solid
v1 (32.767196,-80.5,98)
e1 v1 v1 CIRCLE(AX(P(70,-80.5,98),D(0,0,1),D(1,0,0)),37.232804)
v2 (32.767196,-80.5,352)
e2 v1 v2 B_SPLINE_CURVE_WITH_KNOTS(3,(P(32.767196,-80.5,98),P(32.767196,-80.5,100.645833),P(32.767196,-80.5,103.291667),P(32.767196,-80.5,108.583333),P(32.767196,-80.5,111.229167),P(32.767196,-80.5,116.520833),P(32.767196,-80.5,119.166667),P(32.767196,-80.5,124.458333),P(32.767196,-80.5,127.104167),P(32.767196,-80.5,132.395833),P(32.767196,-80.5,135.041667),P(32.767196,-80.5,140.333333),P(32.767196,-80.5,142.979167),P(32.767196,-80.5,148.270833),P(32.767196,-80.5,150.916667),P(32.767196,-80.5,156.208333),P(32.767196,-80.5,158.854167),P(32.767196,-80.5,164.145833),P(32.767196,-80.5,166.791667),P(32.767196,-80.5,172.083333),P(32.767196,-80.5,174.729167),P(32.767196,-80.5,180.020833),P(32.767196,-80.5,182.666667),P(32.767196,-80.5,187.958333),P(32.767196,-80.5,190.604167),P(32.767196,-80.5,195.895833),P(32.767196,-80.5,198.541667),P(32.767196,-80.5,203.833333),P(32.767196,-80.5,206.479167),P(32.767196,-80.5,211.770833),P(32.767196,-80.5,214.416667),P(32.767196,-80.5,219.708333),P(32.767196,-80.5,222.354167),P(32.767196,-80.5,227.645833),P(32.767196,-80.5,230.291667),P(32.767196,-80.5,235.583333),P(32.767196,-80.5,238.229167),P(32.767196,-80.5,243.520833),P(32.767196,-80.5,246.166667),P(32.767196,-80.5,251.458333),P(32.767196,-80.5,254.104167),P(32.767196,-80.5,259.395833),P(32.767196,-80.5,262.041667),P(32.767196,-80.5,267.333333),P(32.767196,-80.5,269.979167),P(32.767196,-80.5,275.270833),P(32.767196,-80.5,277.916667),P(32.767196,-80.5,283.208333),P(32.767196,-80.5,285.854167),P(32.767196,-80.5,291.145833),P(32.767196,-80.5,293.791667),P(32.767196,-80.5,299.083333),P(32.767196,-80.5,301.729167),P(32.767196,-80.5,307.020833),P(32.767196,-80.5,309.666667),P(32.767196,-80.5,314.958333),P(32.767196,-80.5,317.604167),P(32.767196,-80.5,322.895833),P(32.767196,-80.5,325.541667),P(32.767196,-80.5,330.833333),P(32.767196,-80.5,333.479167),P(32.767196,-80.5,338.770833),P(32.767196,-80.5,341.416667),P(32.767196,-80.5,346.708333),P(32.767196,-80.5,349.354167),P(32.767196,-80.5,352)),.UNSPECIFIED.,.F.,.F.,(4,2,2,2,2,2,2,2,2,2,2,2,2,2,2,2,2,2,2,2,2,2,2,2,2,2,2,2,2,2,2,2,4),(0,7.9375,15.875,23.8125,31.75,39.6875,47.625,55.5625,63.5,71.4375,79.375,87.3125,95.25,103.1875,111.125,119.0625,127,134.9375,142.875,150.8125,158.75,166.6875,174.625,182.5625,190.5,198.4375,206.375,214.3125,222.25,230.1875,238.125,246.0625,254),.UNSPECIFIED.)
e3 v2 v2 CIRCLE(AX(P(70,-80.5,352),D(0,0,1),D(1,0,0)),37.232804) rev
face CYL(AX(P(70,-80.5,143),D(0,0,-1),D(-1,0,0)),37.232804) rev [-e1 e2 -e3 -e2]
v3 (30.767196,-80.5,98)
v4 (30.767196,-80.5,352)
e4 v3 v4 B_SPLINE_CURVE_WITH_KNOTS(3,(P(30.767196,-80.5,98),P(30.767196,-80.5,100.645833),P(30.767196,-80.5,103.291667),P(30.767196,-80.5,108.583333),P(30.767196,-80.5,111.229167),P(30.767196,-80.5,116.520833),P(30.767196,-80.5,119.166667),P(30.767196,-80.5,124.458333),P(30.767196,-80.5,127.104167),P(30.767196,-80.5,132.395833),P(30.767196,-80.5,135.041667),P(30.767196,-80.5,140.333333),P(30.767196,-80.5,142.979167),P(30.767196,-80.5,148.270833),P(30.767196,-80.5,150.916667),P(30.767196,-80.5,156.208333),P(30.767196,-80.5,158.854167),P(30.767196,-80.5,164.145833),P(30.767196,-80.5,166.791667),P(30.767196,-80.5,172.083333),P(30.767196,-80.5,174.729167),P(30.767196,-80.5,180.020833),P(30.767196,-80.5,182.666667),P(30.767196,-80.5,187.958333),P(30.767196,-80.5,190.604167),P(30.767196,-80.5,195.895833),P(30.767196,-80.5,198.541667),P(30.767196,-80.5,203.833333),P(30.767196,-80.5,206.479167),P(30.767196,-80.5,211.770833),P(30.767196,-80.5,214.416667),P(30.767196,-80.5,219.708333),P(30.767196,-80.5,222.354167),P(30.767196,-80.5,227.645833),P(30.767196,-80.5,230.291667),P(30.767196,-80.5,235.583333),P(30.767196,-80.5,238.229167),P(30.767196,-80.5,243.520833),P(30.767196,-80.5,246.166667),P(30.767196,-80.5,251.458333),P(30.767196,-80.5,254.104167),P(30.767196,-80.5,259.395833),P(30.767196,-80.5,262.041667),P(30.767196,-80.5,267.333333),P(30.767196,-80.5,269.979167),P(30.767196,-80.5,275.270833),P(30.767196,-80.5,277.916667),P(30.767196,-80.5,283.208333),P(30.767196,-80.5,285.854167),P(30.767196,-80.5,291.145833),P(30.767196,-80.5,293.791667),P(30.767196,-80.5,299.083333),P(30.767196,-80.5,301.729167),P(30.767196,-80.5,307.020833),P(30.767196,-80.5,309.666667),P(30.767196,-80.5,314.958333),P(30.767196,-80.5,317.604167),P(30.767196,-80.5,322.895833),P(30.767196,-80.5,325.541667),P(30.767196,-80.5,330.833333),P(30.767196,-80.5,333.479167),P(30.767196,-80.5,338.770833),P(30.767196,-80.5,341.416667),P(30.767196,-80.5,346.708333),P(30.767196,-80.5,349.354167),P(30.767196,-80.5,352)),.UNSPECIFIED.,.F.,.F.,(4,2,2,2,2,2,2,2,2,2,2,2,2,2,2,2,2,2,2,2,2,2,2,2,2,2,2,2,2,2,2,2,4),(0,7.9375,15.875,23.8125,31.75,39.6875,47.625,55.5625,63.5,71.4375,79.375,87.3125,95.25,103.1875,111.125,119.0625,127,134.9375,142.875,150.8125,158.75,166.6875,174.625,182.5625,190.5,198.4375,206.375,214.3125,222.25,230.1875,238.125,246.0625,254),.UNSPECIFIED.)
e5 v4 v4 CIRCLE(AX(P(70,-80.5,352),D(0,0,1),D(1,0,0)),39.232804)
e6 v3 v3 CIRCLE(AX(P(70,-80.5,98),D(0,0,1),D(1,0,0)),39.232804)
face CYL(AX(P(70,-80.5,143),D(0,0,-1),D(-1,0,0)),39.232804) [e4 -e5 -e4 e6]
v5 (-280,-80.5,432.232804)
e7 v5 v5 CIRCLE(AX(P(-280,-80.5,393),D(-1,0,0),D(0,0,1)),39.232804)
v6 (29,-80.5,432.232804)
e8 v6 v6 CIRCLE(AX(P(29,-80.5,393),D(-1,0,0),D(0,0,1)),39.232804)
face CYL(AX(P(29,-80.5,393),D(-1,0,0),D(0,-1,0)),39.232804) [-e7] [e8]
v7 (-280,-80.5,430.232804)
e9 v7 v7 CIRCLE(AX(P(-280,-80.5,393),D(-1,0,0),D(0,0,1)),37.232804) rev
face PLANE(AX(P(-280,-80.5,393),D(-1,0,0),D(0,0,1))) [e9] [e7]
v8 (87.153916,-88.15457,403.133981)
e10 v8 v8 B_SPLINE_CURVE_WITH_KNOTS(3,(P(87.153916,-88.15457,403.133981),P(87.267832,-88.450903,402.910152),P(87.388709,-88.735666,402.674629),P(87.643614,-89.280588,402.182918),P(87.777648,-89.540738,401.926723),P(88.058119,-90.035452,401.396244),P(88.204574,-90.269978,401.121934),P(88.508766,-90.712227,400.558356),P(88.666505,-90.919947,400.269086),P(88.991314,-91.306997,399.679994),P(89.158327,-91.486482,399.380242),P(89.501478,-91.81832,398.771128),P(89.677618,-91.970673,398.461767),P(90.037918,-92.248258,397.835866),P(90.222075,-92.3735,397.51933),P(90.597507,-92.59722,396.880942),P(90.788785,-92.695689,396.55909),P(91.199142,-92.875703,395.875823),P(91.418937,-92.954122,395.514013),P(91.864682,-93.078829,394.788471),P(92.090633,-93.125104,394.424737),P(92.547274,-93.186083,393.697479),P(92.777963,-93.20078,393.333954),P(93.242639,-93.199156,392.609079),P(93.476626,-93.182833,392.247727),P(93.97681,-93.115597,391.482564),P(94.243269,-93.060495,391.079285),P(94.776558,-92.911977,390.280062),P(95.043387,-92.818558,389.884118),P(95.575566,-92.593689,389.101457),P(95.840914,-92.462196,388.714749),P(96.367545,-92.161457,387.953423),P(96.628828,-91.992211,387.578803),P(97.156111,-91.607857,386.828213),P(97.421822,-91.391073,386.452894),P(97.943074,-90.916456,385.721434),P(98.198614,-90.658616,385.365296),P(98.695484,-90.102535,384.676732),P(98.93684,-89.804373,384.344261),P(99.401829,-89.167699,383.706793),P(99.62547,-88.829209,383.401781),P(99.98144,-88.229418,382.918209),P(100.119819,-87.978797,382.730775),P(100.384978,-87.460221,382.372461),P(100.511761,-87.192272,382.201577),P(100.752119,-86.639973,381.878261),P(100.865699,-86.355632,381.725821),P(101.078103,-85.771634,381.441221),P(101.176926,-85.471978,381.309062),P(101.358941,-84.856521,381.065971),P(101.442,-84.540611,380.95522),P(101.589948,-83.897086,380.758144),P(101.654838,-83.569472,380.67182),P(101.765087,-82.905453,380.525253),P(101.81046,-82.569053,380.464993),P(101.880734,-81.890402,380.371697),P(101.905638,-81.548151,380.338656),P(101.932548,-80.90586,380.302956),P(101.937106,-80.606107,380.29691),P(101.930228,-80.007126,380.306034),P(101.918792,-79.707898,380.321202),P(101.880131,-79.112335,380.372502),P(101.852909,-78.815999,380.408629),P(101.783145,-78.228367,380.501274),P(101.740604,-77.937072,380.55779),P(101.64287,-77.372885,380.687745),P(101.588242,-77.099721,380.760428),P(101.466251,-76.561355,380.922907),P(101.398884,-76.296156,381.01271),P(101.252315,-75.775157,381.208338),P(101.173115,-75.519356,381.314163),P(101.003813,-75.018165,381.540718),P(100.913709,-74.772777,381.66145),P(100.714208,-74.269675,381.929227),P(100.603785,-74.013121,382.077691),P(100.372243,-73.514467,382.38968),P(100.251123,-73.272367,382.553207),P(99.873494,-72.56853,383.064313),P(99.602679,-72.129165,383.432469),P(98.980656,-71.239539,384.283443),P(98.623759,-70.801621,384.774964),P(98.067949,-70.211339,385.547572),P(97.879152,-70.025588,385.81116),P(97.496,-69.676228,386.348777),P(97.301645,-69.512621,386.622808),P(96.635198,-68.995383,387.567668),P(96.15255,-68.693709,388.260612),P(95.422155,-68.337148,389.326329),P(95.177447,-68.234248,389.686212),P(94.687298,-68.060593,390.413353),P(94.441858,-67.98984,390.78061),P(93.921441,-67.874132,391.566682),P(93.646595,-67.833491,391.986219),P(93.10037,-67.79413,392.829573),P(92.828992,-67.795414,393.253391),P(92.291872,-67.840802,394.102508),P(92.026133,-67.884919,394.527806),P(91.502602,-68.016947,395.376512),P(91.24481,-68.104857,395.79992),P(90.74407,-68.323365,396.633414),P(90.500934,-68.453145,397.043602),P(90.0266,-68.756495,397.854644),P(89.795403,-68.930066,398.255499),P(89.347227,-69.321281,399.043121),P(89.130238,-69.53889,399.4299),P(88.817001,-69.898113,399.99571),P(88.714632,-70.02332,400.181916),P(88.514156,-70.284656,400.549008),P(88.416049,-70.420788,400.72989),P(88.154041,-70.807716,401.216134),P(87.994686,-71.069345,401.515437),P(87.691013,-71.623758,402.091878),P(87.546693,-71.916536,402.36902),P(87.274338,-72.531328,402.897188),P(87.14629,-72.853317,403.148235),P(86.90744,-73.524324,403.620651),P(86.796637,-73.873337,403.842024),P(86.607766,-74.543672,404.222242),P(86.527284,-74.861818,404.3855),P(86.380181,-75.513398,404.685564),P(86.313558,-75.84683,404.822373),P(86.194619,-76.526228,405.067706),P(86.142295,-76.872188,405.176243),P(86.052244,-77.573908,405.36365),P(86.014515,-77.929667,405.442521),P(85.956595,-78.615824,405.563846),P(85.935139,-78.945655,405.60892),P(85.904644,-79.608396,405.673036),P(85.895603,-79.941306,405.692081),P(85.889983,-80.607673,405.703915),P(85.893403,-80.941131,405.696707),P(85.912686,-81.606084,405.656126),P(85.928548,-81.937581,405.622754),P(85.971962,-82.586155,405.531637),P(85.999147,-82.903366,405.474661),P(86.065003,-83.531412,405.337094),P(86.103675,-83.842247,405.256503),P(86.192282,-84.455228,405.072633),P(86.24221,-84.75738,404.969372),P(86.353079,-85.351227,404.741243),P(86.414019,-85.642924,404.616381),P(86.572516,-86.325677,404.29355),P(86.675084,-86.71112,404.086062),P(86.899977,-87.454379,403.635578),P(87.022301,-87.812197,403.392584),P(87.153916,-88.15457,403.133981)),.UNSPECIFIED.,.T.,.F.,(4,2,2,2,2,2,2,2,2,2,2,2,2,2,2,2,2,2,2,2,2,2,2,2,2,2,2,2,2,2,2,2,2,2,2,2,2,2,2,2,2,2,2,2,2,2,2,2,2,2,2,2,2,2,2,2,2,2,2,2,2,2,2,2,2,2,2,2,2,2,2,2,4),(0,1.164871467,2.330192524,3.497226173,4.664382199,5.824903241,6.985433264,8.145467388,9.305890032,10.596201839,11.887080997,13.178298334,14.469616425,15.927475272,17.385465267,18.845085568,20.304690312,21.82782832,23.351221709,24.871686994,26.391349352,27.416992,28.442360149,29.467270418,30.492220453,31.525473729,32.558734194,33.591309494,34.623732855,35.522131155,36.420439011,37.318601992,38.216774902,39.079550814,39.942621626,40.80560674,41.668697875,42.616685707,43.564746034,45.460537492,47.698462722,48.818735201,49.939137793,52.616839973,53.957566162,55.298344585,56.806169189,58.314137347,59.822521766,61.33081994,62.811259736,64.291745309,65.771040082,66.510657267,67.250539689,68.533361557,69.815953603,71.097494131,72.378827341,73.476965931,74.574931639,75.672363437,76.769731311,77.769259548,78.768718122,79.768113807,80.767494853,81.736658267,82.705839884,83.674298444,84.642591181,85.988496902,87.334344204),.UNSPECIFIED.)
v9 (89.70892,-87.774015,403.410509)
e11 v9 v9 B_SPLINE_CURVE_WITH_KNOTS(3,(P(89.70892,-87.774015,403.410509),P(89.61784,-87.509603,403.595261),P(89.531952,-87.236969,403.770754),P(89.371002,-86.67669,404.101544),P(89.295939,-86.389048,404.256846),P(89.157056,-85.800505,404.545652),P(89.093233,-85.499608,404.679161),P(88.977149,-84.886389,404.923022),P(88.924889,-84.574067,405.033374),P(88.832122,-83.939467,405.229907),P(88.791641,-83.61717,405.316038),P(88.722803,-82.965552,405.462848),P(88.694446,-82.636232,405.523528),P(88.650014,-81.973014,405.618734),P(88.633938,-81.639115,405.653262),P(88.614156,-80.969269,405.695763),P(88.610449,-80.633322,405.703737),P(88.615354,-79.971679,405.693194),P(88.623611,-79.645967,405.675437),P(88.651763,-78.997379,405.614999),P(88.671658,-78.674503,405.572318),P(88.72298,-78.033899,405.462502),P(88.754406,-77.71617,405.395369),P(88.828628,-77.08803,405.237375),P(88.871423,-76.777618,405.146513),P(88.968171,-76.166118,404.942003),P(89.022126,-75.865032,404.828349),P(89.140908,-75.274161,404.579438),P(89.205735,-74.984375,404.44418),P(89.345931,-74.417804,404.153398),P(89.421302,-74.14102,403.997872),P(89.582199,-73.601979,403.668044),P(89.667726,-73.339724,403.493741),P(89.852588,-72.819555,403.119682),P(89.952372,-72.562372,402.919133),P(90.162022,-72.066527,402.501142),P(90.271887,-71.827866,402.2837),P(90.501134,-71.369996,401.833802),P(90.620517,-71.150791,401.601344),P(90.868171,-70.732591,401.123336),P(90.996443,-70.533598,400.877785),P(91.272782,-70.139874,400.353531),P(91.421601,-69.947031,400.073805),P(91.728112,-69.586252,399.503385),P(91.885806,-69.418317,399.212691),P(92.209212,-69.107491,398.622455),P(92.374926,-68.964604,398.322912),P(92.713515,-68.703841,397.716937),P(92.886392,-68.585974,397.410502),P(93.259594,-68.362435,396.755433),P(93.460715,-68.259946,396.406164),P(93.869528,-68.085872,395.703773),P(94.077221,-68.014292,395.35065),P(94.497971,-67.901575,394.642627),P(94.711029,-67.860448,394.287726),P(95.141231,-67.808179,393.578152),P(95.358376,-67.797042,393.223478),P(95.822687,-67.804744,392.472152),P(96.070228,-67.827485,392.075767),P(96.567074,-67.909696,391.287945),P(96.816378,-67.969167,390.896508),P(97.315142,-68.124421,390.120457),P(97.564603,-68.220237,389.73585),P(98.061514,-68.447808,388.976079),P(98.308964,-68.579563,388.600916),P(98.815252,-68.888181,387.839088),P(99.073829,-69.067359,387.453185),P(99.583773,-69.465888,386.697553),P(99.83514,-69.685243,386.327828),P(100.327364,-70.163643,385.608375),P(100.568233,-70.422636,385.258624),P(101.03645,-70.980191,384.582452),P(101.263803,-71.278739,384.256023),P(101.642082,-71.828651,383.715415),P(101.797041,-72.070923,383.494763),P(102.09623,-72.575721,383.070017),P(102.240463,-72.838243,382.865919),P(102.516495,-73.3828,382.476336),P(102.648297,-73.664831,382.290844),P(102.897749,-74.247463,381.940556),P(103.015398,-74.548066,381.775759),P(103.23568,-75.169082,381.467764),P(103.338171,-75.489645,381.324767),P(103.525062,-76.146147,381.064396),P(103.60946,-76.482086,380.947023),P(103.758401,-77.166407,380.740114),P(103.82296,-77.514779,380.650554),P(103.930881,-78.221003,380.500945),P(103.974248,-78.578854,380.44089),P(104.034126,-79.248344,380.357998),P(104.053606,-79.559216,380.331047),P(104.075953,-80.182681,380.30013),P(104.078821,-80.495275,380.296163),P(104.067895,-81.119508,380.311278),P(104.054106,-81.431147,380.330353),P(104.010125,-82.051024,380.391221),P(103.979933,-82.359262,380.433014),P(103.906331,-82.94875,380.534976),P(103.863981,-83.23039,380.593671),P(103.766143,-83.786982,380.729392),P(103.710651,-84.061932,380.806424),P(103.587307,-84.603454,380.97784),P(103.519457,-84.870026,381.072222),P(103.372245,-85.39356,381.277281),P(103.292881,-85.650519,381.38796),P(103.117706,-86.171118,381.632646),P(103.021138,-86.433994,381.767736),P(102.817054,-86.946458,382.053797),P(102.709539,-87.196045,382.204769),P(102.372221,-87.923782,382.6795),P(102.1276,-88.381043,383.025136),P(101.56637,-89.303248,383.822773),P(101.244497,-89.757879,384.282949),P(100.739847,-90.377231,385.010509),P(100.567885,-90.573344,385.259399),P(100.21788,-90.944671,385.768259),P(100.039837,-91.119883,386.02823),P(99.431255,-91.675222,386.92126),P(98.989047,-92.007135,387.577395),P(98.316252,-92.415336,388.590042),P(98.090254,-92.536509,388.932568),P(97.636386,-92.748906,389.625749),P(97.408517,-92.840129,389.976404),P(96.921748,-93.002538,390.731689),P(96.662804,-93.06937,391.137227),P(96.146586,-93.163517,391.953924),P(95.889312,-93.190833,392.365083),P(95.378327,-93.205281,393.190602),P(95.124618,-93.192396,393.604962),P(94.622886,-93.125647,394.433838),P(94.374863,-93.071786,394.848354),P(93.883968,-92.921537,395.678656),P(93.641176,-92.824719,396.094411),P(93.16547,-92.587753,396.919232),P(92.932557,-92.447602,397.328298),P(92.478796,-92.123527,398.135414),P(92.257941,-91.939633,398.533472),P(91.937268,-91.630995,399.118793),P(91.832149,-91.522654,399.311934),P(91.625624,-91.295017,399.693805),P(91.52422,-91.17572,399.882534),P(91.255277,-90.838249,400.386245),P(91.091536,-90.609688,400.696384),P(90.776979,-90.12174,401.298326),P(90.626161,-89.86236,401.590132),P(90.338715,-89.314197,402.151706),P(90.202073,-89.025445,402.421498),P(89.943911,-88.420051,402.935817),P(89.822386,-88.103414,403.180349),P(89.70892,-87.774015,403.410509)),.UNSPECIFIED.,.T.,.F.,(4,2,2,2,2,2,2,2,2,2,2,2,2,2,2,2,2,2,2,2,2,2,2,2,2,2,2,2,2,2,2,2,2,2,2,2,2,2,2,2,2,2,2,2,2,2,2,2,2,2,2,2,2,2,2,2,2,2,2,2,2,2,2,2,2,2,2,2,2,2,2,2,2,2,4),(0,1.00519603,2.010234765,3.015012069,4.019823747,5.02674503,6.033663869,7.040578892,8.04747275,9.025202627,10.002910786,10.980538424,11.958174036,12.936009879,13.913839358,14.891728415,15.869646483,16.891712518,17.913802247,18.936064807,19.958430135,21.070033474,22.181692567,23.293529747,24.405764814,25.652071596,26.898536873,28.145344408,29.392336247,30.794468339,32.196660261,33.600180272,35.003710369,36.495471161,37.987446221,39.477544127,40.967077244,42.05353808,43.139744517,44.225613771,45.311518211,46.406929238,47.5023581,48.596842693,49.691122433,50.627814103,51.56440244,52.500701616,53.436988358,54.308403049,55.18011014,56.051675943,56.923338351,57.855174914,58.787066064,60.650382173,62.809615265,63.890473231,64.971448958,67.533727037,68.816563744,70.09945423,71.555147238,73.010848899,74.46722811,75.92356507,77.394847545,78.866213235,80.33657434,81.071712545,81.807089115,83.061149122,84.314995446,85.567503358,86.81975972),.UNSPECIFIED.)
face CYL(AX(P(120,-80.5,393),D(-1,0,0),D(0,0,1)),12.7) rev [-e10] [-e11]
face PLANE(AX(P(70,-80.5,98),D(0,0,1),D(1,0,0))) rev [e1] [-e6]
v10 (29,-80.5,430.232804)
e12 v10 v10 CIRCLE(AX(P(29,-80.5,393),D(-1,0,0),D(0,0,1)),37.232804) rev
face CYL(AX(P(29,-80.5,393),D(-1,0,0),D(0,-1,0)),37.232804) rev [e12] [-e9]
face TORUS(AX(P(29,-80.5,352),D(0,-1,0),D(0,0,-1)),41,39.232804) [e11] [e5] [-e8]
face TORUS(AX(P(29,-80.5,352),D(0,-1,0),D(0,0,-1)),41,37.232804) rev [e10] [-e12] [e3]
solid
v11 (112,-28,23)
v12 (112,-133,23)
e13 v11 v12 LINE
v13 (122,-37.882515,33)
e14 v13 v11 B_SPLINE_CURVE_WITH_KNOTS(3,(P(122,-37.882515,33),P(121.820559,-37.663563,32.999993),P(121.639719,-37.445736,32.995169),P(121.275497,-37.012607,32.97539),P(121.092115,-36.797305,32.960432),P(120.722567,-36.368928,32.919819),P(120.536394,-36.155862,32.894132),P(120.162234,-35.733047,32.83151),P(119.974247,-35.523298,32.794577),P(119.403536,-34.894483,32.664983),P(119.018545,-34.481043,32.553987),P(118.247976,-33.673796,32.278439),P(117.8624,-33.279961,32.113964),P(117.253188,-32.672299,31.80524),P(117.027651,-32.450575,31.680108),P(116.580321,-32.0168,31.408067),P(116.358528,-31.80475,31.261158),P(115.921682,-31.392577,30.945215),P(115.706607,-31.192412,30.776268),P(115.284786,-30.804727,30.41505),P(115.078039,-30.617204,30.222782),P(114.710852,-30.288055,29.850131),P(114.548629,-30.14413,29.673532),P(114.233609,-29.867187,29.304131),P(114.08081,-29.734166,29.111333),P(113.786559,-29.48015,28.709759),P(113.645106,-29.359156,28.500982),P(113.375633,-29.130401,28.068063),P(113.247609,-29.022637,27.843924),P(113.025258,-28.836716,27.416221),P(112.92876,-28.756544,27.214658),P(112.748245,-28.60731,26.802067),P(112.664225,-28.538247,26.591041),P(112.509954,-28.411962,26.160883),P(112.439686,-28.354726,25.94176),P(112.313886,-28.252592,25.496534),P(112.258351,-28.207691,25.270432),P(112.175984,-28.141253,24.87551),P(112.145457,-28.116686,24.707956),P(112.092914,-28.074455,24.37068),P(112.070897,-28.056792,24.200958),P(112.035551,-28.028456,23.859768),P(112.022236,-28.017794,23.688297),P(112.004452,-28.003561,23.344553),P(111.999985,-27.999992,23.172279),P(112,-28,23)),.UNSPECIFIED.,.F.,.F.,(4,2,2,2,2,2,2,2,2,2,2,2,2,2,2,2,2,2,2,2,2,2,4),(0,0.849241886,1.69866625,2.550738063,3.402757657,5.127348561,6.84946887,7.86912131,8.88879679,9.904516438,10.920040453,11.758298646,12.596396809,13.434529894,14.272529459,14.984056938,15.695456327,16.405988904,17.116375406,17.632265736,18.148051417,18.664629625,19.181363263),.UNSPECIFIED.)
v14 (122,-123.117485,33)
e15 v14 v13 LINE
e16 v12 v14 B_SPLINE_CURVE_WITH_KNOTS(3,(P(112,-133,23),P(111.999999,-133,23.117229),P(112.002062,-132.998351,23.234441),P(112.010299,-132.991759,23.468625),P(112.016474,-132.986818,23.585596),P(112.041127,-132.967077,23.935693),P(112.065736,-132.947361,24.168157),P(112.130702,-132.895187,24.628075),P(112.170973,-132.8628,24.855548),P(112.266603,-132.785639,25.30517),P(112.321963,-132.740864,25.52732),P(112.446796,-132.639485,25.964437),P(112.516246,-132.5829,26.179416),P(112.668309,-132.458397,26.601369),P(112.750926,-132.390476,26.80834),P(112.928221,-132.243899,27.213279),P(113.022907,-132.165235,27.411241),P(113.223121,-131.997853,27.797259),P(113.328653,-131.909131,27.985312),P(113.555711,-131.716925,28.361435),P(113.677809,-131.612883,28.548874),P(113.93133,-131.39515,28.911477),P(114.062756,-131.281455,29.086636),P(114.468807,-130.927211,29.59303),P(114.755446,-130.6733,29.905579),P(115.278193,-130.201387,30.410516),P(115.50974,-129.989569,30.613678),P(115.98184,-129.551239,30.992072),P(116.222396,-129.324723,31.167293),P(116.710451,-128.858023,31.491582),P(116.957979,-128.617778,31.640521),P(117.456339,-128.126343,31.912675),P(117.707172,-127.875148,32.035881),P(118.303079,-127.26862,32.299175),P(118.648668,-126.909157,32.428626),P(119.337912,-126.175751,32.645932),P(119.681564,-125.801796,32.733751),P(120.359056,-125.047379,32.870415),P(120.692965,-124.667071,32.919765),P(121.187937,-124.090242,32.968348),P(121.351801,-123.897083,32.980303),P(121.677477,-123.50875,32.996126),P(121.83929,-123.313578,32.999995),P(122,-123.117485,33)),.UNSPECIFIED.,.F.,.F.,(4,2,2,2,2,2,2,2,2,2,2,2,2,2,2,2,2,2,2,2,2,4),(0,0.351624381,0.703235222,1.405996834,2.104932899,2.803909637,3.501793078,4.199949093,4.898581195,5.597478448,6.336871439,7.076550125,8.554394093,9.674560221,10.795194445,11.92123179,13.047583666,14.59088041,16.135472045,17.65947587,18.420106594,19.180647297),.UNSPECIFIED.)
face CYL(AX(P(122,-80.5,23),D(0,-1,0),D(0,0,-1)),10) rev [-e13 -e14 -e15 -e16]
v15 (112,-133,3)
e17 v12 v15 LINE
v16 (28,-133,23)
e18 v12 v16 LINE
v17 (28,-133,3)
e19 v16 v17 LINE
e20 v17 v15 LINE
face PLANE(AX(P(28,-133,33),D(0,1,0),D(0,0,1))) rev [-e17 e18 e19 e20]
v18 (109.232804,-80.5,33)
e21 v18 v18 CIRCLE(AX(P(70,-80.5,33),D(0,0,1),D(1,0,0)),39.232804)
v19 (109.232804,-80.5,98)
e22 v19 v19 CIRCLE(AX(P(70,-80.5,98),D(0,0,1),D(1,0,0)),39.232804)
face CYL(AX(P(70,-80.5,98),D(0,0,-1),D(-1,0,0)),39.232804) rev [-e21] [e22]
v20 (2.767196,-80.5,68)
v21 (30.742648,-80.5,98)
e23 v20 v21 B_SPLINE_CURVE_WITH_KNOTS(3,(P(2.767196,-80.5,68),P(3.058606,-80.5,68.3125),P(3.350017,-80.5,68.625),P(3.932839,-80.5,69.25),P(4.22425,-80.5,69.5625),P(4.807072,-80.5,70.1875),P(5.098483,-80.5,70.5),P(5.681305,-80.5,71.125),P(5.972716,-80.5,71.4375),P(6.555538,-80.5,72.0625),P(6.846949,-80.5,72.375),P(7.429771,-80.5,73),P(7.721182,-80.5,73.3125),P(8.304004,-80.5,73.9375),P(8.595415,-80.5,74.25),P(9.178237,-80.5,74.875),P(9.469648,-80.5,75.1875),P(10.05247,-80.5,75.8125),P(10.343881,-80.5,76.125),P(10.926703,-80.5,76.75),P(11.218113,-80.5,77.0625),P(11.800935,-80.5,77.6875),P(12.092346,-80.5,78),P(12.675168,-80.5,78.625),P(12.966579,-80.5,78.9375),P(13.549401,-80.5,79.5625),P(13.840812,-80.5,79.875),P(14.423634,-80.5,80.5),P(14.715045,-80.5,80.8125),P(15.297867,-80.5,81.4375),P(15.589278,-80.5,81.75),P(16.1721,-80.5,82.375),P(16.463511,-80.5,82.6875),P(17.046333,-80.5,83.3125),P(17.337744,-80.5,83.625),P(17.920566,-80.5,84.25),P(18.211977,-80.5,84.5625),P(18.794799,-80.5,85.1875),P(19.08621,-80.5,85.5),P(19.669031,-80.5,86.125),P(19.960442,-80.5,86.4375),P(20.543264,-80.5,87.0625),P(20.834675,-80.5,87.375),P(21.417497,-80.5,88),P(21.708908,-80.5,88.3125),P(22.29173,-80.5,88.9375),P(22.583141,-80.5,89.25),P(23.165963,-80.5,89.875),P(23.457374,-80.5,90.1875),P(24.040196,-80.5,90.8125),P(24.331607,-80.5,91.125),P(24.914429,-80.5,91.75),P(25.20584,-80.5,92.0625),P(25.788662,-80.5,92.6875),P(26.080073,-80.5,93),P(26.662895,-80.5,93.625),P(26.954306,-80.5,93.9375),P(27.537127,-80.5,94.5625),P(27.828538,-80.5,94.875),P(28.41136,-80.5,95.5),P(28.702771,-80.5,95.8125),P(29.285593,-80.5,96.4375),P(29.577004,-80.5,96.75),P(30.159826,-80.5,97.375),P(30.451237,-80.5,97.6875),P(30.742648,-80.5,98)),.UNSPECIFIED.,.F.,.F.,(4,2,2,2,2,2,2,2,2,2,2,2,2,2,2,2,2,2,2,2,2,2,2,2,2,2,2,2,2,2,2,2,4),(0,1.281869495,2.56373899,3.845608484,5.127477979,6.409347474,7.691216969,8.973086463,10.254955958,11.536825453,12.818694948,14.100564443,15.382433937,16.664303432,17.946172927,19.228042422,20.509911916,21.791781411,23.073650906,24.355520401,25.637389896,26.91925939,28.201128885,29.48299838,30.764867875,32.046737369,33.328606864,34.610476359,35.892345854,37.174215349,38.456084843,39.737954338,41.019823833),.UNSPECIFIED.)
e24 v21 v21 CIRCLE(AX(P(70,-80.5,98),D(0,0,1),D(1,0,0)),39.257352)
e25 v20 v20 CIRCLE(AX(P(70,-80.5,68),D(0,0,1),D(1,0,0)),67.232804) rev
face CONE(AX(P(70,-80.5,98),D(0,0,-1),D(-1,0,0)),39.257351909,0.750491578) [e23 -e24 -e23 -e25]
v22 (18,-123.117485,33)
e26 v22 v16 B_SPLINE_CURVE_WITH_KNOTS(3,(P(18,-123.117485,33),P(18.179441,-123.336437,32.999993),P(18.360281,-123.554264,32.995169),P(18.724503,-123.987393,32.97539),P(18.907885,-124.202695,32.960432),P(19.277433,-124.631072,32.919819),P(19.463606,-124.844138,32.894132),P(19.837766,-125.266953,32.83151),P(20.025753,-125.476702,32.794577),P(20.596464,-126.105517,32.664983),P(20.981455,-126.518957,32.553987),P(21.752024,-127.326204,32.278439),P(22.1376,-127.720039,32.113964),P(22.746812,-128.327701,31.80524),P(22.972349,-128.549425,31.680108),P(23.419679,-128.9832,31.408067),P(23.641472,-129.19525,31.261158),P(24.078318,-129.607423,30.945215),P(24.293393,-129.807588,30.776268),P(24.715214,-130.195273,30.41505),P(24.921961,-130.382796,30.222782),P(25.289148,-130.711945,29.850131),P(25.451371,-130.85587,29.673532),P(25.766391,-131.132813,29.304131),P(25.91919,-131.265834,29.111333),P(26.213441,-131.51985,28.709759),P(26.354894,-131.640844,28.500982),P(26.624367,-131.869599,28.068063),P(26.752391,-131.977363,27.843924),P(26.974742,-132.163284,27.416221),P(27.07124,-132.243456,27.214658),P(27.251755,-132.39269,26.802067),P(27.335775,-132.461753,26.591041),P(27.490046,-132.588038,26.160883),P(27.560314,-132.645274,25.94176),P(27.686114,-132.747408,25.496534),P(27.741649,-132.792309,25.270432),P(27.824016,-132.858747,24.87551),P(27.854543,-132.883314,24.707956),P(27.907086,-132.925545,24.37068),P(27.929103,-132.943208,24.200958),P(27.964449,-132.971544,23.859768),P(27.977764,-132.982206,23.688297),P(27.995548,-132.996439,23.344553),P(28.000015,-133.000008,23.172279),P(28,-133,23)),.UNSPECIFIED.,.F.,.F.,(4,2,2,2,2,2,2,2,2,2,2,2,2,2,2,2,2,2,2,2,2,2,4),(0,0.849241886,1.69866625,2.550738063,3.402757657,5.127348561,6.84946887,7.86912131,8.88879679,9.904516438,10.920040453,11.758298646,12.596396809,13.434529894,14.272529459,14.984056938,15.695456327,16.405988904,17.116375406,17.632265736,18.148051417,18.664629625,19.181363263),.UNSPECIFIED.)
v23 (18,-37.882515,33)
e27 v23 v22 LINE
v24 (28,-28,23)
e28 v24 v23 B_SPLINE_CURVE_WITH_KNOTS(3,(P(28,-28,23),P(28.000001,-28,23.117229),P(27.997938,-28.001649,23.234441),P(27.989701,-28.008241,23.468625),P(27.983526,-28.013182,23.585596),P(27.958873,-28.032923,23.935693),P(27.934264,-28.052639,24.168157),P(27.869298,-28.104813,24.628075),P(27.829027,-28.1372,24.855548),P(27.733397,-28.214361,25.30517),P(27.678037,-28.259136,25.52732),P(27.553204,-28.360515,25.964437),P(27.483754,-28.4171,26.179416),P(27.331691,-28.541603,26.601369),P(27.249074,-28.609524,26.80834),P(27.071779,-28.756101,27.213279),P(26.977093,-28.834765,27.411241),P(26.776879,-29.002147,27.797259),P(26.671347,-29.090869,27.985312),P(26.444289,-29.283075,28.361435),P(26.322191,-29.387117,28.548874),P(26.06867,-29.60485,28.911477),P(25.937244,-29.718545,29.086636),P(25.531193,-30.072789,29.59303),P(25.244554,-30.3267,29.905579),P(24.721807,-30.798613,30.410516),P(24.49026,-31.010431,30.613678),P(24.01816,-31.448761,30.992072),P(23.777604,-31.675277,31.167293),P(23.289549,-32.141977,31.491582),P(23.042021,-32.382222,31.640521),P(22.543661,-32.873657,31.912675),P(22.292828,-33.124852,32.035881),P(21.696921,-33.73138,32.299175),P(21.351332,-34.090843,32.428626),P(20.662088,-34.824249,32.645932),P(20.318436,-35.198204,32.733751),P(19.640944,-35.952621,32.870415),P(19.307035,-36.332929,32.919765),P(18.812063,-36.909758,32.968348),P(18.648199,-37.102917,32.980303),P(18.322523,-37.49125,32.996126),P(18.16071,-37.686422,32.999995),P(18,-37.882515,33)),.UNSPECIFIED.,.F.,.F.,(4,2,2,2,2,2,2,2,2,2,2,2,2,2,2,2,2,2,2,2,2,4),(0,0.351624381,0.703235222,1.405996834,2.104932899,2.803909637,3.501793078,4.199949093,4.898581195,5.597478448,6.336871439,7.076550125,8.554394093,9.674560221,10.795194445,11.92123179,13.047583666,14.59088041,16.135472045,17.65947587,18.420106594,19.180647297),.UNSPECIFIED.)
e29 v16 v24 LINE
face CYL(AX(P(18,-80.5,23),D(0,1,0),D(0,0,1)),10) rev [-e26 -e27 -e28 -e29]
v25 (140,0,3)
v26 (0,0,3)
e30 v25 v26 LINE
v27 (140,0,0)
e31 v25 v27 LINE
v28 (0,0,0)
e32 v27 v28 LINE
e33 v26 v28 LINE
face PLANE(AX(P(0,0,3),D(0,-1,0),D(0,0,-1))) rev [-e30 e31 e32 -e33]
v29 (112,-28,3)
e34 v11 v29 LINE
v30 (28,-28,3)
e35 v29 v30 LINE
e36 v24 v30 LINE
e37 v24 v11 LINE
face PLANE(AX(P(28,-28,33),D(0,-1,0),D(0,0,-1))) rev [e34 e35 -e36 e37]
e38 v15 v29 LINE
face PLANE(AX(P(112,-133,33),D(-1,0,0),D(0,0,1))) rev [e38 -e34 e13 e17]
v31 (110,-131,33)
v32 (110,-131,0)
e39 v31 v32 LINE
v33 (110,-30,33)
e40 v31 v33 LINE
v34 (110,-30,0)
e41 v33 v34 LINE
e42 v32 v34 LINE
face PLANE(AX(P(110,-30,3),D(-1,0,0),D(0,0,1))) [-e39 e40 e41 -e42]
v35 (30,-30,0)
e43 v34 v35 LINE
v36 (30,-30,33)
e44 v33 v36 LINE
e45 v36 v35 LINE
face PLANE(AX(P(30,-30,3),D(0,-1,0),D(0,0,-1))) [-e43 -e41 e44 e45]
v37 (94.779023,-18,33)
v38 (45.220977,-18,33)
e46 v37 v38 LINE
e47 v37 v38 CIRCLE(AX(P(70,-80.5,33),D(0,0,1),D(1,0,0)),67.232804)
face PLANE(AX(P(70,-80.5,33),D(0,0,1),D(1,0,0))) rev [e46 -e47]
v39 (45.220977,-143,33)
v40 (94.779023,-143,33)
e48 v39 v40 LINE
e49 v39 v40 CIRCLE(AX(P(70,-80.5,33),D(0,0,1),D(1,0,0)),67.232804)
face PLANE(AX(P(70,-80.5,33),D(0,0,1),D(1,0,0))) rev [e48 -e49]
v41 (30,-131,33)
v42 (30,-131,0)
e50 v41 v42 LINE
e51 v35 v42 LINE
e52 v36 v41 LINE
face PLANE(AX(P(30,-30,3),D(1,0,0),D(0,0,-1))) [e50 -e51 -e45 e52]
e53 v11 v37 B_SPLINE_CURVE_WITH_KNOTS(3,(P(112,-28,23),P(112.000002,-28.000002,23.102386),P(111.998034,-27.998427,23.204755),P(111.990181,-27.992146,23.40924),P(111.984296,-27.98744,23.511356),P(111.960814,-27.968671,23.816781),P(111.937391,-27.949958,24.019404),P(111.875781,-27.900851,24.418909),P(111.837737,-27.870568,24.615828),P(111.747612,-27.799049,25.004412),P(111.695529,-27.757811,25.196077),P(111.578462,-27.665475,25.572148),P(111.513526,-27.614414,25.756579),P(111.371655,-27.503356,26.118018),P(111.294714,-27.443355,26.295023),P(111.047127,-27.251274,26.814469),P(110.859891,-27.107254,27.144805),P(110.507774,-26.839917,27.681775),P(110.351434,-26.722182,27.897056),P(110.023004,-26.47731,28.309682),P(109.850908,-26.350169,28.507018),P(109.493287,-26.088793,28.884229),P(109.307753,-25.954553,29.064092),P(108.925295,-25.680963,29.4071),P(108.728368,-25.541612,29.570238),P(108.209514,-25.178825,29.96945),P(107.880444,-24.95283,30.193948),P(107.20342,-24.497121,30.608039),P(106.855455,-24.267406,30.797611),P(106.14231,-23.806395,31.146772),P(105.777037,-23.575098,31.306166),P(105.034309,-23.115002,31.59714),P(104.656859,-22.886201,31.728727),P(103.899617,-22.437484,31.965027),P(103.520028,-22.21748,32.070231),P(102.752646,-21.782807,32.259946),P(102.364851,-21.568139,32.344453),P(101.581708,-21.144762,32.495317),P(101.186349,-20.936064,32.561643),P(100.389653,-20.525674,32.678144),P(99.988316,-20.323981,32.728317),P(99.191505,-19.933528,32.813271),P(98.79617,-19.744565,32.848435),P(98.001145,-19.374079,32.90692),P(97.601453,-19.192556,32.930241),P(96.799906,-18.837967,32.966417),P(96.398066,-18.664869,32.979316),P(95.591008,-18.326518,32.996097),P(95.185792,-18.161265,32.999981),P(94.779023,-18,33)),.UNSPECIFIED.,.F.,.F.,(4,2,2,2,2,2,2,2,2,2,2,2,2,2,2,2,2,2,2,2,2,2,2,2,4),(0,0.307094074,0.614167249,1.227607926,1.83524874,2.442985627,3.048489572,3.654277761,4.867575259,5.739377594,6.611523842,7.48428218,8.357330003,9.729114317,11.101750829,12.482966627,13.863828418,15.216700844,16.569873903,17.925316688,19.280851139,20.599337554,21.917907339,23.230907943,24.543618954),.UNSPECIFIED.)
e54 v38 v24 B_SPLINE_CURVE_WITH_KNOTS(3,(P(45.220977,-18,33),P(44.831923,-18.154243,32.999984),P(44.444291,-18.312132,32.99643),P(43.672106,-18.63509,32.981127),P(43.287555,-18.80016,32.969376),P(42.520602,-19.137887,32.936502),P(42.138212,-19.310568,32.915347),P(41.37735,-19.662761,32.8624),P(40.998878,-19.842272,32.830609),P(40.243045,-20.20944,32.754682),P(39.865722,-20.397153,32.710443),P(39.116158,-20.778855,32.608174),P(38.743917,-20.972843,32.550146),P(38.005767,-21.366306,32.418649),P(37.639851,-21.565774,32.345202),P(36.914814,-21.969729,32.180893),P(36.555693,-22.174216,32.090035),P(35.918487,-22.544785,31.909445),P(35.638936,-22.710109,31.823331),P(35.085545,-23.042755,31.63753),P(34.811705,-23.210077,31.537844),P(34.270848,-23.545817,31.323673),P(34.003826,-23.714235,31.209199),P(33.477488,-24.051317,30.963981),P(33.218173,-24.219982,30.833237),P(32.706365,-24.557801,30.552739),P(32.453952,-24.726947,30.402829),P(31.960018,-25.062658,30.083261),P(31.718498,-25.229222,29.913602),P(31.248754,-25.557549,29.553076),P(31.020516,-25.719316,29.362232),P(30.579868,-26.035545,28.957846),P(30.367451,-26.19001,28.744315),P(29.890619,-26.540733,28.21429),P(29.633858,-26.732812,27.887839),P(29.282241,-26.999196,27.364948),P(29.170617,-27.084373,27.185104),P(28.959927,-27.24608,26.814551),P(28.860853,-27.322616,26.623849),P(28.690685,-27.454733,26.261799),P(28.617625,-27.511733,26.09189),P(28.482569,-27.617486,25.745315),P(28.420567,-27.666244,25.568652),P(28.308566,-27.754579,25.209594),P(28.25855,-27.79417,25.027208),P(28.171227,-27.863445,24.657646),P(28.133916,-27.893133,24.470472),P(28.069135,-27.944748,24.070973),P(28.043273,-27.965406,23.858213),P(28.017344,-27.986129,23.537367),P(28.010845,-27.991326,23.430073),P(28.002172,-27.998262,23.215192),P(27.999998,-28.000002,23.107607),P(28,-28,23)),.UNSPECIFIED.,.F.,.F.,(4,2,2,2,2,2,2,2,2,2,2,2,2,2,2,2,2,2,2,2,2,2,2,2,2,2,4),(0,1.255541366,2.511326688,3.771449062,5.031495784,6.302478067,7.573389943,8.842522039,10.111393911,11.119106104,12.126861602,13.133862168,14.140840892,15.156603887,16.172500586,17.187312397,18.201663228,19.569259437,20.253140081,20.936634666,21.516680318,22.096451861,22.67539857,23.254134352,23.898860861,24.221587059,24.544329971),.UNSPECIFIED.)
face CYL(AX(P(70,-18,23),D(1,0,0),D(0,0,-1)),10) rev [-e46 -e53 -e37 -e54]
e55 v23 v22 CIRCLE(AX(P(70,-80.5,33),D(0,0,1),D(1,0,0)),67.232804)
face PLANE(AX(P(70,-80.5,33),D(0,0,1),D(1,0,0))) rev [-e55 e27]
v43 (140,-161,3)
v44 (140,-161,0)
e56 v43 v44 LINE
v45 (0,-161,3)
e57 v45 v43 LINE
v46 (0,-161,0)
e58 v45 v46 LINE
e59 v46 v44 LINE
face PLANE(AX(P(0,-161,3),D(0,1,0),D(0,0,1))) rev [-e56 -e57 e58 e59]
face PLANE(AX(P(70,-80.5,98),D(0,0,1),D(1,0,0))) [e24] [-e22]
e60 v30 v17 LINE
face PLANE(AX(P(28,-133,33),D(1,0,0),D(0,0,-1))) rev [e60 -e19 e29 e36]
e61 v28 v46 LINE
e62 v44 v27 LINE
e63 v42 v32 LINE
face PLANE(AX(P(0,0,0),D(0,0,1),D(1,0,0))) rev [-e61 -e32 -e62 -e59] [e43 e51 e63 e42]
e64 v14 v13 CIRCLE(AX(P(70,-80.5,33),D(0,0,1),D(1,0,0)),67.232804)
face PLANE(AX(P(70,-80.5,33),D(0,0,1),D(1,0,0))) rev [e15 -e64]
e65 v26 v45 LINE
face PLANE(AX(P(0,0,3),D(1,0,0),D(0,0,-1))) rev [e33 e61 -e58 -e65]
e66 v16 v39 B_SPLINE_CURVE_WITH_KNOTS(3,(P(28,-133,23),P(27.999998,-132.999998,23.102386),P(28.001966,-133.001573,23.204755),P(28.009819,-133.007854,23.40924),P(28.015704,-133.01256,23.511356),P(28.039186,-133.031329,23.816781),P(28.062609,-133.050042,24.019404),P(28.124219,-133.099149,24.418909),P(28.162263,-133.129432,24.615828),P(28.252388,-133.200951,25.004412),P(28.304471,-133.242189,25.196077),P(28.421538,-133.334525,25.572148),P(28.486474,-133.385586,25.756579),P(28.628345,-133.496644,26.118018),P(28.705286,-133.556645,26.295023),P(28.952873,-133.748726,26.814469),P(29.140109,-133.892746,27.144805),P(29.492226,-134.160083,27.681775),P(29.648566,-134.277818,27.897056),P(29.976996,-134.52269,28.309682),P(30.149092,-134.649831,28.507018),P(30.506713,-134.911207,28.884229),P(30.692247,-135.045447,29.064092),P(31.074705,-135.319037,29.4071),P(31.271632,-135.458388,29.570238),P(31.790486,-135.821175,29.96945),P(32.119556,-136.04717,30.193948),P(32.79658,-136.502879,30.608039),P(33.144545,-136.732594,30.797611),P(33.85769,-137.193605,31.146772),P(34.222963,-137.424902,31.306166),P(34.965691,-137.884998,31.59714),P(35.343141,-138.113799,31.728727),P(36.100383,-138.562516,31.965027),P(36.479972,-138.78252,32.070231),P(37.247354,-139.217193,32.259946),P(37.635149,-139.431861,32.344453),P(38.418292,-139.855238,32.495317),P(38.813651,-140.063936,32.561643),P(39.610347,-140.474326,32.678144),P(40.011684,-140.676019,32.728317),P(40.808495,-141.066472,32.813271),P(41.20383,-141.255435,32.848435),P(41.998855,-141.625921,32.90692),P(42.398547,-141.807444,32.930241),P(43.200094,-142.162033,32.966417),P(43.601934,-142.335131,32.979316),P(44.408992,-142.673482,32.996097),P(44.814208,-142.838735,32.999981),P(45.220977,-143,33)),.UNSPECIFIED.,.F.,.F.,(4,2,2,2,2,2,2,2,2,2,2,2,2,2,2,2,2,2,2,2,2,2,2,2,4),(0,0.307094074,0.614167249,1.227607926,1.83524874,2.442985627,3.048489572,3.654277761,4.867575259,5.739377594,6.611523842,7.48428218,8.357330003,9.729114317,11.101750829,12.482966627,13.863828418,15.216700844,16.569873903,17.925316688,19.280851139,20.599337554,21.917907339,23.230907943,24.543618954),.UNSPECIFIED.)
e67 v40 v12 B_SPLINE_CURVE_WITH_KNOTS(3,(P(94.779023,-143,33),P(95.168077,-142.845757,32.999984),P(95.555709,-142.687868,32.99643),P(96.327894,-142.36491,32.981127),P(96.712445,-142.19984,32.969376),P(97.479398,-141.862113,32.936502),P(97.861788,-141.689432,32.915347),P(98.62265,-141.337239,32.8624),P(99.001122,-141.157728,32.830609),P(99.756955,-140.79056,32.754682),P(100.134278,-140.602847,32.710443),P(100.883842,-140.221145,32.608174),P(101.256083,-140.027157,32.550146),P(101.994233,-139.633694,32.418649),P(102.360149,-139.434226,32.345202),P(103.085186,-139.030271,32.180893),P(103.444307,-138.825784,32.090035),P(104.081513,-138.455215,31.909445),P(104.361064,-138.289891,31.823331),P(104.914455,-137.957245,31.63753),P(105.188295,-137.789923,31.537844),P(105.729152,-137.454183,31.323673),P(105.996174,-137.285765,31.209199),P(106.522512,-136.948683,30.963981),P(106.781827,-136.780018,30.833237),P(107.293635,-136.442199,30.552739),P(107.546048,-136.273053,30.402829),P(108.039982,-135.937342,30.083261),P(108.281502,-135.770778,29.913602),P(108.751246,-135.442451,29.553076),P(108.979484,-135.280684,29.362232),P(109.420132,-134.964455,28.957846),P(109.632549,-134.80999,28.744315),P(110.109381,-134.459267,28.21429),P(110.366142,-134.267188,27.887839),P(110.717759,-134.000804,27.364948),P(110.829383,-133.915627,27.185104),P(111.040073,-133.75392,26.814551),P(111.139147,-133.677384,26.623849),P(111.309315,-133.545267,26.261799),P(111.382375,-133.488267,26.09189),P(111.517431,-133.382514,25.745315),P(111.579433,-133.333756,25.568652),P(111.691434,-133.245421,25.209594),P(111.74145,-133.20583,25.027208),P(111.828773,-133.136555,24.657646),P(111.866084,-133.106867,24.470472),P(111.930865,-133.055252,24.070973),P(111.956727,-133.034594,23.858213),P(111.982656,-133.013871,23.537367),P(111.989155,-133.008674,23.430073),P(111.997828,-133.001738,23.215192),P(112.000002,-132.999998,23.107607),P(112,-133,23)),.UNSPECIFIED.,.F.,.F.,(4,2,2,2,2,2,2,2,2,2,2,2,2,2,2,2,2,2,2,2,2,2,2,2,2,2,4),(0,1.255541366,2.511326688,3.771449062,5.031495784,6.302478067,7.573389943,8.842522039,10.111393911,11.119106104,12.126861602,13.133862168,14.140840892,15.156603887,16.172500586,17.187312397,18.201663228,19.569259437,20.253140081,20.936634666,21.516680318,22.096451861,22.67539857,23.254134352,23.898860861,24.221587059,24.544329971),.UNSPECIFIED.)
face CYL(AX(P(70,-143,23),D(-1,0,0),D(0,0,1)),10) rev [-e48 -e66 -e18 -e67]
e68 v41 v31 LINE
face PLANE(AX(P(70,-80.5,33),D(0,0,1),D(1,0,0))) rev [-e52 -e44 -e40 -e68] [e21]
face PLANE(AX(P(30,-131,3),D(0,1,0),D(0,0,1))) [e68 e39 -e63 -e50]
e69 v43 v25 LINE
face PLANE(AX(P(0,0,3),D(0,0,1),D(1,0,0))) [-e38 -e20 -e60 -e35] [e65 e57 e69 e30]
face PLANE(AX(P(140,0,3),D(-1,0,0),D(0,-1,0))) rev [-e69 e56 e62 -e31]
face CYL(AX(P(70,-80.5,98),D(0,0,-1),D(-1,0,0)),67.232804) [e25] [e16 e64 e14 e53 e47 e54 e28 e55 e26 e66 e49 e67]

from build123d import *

# Parameters (mm, degrees)
CROQUIS1_W              = 140
CROQUIS1_H              = 161
CROQUIS1_W_2            = 80
CROQUIS1_H_2            = 101
SALIENTE_EXTRUIR1_DEPTH = 3
CROQUIS2_W              = 84
CROQUIS2_H              = 105
CROQUIS2_W_2            = 80
CROQUIS2_H_2            = 101
SALIENTE_EXTRUIR2_DEPTH = 30
CROQUIS3_R              = 67.232804493
CROQUIS3_R_2            = 39.232804493
SALIENTE_EXTRUIR3_DEPTH = 65
CROQUIS6_R              = 39.232804493
CROQUIS6_R_2            = 37.232804493
SALIENTE_EXTRUIR4_DEPTH = 45
CHAFL_N1_SIZE           = 30
CHAFL_N1_SIZE2          = 27.975452584
REDONDEO1_R             = 10
REDONDEO2_R             = 10
REDONDEO3_R             = 10
REDONDEO4_R             = 10
CROQUIS7_R              = 39.232804493
CROQUIS7_R_2            = 37.232804493
CROQUIS8_R              = 12.7
CORTAR_EXTRUIR1_DEPTH   = 120


with BuildPart() as part:
    # Croquis1 → Saliente-Extruir1 (new body)
    with BuildSketch(Plane.XY):
        with Locations((70, -80.5)):
            Rectangle(CROQUIS1_W, CROQUIS1_H)
        with Locations((70, -80.5)):
            Rectangle(CROQUIS1_W_2, CROQUIS1_H_2, mode=Mode.SUBTRACT)
    extrude(amount=SALIENTE_EXTRUIR1_DEPTH)

    # Croquis2 → Saliente-Extruir2 (add)
    with BuildSketch(Plane.XY.offset(3)):
        with Locations((70, -80.5)):
            Rectangle(CROQUIS2_W, CROQUIS2_H)
        with Locations((70, -80.5)):
            Rectangle(CROQUIS2_W_2, CROQUIS2_H_2, mode=Mode.SUBTRACT)
    extrude(amount=SALIENTE_EXTRUIR2_DEPTH)

    # Croquis3 → Saliente-Extruir3 (add)
    with BuildSketch(Plane.XY.offset(33)):
        with Locations(Location((70, -80.5, 0), (0, 0, 128.659808254))):
            Circle(CROQUIS3_R)
        with Locations((70, -80.5)):
            Circle(CROQUIS3_R_2, mode=Mode.SUBTRACT)
    extrude(amount=SALIENTE_EXTRUIR3_DEPTH)

    # Chaflán1
    chafl_n1_edges = [part.edges().sort_by_distance(p)[0] for p in [
        (112, -133, 98),
    ]]
    chafl_n1_side = [part.faces().sort_by_distance(p)[0] for p in [
        (112, -133, 65.5),
    ]]
    chamfer(chafl_n1_edges, length=CHAFL_N1_SIZE, length2=CHAFL_N1_SIZE2, reference=chafl_n1_side[0])

    # Redondeo1
    # the kernel refuses this fillet: 10 mm, written as the material it adds along each edge
    with BuildSketch(Plane(origin=(28, -28, 33), x_dir=(0, 1, 0), z_dir=(1, 0, 0))) as redondeo1_piece_1_section:
        with BuildLine():
            CenterArc((REDONDEO1_R, -REDONDEO1_R), REDONDEO1_R, 90, 90)
            Line((0, -REDONDEO1_R), (0, 0))
            Line((0, 0), (REDONDEO1_R, 0))
        make_face()
    redondeo1_piece_1 = extrude(amount=84, mode=Mode.PRIVATE)
    redondeo1_piece_1 = redondeo1_piece_1 & Plane(origin=(70, -80.5, 30.631973807), x_dir=(-0.6246950475531964, 0.7808688094440126, 0), z_dir=(0, 0, -1)) * Cylinder(67.232804493, 209, mode=Mode.PRIVATE)
    add(redondeo1_piece_1)

    # Redondeo2
    # the kernel refuses this fillet: 10 mm, written as the material it adds along each edge
    with BuildSketch(Plane(origin=(112, -3, 33), x_dir=(0, 0, -1), z_dir=(0, -1, 0))) as redondeo2_piece_1_section:
        with BuildLine():
            CenterArc((REDONDEO2_R, REDONDEO2_R), REDONDEO2_R, 180, 90)
            Line((0, REDONDEO2_R), (0, 0))
            Line((0, 0), (REDONDEO2_R, 0))
        make_face()
    redondeo2_piece_1 = extrude(amount=130, mode=Mode.PRIVATE)
    redondeo2_piece_1 = redondeo2_piece_1 & Plane(origin=(70, -80.5, 30.687304205), x_dir=(-0.6246950475530829, 0.7808688094441035, 0), z_dir=(0, 0, -1)) * Cylinder(67.232804493, 300, mode=Mode.PRIVATE)
    add(redondeo2_piece_1)

    # Redondeo3
    # the kernel refuses this fillet: 10 mm, written as the material it adds along each edge
    with BuildSketch(Plane(origin=(28, -133, 33), x_dir=(-1, 0, 0), z_dir=(0, 1, 0))) as redondeo3_piece_1_section:
        with BuildLine():
            CenterArc((REDONDEO3_R, -REDONDEO3_R), REDONDEO3_R, 90, 90)
            Line((0, -REDONDEO3_R), (0, 0))
            Line((0, 0), (REDONDEO3_R, 0))
        make_face()
    redondeo3_piece_1 = extrude(amount=130, mode=Mode.PRIVATE)
    redondeo3_piece_1 = redondeo3_piece_1 & Plane(origin=(70, -80.5, 30.687304147), x_dir=(-0.6246950475531964, 0.7808688094440126, 0), z_dir=(0, 0, -1)) * Cylinder(67.232804493, 300, mode=Mode.PRIVATE)
    add(redondeo3_piece_1)

    # Redondeo4
    redondeo4_edges = [part.edges().sort_by_distance(p)[0] for p in [
        (70, -133, 33),
    ]]
    fillet(redondeo4_edges, radius=REDONDEO4_R)


with BuildPart() as body_2:
    # Croquis6 → Saliente-Extruir4 (new body)
    with BuildSketch(Plane.XY.offset(98)):
        with Locations(Location((70, -80.5, 0), (0, 0, 180))):
            Circle(CROQUIS6_R)
        with Locations(Location((70, -80.5, 0), (0, 0, 180))):
            Circle(CROQUIS6_R_2, mode=Mode.SUBTRACT)
    extrude(amount=SALIENTE_EXTRUIR4_DEPTH)

    # Barrer1: sweep along a curve in space
    with BuildLine() as barrer1_path:
        Line((70, -80.5, 143), (70, -80.5, 352))
        ThreePointArc((70, -80.5, 352), (57.991378029, -80.5, 380.991378029), (29, -80.5, 393))
        Line((29, -80.5, 393), (-280, -80.5, 393))
    # Croquis7 → Barrer1 (sweep)
    with BuildSketch(Plane.XY.offset(143)):
        with Locations((70, -80.5)):
            Circle(CROQUIS7_R)
        with Locations((70, -80.5)):
            Circle(CROQUIS7_R_2, mode=Mode.SUBTRACT)
    sweep(path=barrer1_path.line)

    # Croquis8 → Cortar-Extruir1 (cut)
    with BuildSketch(Plane(origin=(0, 0, 0), x_dir=(0, 0, -1), z_dir=(1, 0, 0))):
        with Locations(Location((-393, -80.5, 0), (0, 0, 180))):
            Circle(CROQUIS8_R)
    extrude(amount=CORTAR_EXTRUIR1_DEPTH, mode=Mode.SUBTRACT)


solid = Compound([part.part, body_2.part])
